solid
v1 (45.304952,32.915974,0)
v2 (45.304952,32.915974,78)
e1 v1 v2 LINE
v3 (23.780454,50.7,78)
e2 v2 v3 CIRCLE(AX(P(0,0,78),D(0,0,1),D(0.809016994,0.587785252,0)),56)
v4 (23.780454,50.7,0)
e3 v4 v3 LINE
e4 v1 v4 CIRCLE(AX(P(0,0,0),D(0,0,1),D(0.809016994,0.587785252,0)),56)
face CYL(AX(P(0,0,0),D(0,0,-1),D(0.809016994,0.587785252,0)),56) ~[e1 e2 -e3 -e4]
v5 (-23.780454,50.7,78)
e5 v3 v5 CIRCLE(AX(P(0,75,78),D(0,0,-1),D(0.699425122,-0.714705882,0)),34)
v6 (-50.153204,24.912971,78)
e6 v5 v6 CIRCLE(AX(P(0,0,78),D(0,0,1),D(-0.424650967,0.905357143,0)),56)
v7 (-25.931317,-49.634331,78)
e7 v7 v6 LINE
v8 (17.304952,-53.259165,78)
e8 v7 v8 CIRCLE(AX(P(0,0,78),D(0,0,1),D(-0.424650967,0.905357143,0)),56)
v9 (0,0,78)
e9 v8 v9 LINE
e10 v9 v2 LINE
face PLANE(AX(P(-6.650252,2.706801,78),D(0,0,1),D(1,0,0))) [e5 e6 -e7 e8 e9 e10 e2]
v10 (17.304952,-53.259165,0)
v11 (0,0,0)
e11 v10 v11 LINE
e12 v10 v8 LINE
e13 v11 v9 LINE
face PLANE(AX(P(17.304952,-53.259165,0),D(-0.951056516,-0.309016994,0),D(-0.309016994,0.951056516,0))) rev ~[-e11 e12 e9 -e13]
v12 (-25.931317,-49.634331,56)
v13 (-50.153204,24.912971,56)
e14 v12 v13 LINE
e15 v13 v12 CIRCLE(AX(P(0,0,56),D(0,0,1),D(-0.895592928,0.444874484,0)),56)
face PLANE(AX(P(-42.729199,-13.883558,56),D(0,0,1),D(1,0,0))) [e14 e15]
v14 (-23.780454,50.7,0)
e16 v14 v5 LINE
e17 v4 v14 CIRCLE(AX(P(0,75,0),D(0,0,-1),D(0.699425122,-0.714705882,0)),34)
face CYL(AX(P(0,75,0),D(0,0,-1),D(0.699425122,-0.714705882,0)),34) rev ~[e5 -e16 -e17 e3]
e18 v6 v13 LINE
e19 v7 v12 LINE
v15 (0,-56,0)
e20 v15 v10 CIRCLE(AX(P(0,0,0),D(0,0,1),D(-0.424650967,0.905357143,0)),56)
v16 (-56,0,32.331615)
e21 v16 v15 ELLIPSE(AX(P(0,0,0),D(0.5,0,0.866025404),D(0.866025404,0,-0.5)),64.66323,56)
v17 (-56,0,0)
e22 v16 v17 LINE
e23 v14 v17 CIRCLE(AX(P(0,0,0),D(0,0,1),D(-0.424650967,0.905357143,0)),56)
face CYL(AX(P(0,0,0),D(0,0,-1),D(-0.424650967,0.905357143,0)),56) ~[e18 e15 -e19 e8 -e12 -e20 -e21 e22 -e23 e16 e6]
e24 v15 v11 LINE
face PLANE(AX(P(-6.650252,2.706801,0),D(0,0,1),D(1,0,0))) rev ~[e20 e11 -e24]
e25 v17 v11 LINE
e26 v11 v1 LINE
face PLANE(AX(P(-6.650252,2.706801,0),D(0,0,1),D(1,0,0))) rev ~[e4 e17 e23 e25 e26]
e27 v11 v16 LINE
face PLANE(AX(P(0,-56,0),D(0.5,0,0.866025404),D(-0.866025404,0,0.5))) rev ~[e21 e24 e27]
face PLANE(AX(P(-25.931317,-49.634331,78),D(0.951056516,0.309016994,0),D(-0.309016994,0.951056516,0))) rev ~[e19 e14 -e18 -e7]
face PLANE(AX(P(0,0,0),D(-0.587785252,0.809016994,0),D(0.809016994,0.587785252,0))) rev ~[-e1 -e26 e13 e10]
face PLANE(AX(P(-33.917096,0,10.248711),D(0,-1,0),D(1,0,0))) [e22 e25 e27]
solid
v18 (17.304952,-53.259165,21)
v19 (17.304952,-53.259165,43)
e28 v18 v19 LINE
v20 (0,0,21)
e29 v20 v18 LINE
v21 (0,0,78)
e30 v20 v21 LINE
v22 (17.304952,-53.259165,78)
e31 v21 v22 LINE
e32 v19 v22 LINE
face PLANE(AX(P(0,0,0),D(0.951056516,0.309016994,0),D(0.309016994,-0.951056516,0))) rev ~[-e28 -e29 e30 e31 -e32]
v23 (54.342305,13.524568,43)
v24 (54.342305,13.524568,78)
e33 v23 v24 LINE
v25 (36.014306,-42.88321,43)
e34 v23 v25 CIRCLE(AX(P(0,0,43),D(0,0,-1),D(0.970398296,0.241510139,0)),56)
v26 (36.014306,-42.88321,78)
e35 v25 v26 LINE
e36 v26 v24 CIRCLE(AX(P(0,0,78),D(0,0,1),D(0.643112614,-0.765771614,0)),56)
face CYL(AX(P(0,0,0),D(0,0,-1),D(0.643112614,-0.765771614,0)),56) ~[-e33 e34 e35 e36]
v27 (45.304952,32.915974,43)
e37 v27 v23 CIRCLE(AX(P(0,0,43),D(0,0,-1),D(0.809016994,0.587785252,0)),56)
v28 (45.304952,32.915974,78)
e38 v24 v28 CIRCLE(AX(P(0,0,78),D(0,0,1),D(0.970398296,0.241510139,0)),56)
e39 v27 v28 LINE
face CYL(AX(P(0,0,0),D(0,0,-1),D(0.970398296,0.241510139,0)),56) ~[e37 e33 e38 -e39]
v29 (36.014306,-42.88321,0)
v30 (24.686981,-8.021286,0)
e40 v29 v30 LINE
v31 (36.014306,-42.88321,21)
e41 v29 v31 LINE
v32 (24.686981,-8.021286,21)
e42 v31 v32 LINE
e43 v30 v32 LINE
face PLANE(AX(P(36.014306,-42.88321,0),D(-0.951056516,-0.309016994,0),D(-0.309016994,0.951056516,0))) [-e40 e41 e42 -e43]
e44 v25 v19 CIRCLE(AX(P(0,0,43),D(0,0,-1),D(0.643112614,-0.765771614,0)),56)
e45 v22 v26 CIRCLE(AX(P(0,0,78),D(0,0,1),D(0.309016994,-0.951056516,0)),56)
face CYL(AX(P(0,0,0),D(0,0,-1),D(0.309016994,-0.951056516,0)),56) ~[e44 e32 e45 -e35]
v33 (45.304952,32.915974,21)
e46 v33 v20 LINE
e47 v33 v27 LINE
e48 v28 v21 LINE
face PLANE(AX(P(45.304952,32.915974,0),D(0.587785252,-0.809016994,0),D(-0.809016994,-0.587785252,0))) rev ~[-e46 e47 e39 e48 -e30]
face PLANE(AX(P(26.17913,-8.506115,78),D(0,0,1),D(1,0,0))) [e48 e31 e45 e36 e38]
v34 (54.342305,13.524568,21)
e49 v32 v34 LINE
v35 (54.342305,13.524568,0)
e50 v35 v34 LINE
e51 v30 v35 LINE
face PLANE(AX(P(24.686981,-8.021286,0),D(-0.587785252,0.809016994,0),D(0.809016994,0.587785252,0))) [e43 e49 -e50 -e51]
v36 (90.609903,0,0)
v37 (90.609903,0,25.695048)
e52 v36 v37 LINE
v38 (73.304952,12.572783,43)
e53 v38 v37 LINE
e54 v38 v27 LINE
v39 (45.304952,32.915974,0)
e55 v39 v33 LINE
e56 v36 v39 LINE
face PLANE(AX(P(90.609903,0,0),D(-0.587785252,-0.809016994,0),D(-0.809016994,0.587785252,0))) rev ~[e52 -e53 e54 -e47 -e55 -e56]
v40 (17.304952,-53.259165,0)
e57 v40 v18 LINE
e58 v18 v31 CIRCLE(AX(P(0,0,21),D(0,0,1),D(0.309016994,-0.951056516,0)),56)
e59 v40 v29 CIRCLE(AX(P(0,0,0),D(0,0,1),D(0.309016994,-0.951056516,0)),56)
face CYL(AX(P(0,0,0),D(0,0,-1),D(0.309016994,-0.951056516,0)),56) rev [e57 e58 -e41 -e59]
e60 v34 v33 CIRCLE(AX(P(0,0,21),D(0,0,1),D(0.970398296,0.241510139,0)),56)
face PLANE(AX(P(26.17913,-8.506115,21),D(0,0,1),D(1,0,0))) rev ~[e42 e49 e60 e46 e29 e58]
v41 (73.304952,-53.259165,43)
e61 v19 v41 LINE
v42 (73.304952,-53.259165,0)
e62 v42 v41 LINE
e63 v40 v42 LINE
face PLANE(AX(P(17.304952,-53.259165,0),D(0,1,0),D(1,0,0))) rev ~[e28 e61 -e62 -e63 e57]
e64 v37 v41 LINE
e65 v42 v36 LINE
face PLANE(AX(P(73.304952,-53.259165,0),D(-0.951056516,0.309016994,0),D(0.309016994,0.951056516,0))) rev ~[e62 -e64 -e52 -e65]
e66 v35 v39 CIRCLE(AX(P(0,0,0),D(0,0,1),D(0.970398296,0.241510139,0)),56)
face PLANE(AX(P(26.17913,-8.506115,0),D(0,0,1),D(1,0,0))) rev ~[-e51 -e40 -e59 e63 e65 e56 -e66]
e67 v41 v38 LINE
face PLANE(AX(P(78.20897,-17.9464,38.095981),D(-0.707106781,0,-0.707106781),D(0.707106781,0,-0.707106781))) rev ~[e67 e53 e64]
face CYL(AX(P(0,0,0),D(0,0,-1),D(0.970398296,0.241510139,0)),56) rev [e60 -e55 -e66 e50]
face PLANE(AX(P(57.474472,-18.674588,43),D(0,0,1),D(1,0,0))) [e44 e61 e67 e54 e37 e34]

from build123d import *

# Parameters (mm, degrees)
F1_DEPTH  = 78
F2_DEPTH  = 43
F4_DEPTH  = 22
F7_DEPTH  = 56
F11_DEPTH = 15
F12_DEPTH = 78
F13_DEPTH = 21
F14_DEPTH = 15


with BuildPart() as f1:
    # F0 (on Top) → F1 (new body)
    with BuildSketch(Plane.XY):
        with BuildLine():
            Line((17.304951685, -53.2591649125), (0, 0))
            Line((0, 0), (45.304951685, 32.9159741284))
            ThreePointArc((45.304951685, 32.9159741284), (35.6688410129, 43.1709830882), (23.7804541588, 50.7))
            ThreePointArc((23.7804541588, 50.7), (0, 41), (-23.7804541588, 50.7))
            ThreePointArc((-23.7804541588, 50.7), (-52.0803228235, -20.5825162359), (17.304951685, -53.2591649125))
        make_face()
    extrude(amount=F1_DEPTH)

    # F3 (on face) → F4 (cut)
    with BuildSketch(Plane.XY.offset(78)):
        with BuildLine():
            ThreePointArc((-50.1532039809, 24.9129711286), (-53.2591649125, -17.304951685), (-25.9313173227, -49.6343306786))
            Line((-25.9313173227, -49.6343306786), (-50.1532039809, 24.9129711286))
        make_face()
    extrude(amount=-F4_DEPTH, mode=Mode.SUBTRACT)

    # F6 (on offset) → F7 (cut)
    with BuildSketch(Plane.XZ.offset(56)):
        Polygon((-56, 0), (0, 0), (-56, 32.3316150746), align=None)
    extrude(amount=-F7_DEPTH, mode=Mode.SUBTRACT)

    # F10 (on face) → F14 (cut)
    with BuildSketch(Plane(origin=(58.1524758425, 0, 58.1524758425), x_dir=(0.7071067812, 0, -0.7071067812), z_dir=(-0.7071067812, 0, -0.7071067812))):
        Polygon((21.42883684, -12.5727833442), (45.9017342091, 0), (21.42883684, 53.2591649125), align=None)
    extrude(amount=-F14_DEPTH, mode=Mode.SUBTRACT)


with BuildPart() as f1b:
    # F0 (on Top) → F1, piece 2 (new body)
    with BuildSketch(Plane.XY):
        with BuildLine():
            ThreePointArc((36.0143064054, -42.8832103992), (53.2591649125, -17.304951685), (54.3423045662, 13.5245678096))
            Line((54.3423045662, 13.5245678096), (24.6869805963, -8.0212862363))
            Line((24.6869805963, -8.0212862363), (36.0143064054, -42.8832103992))
        make_face()
    extrude(amount=F1_DEPTH)

    # F0 (on Top) → F2 (join)
    with BuildSketch(Plane.XY):
        with BuildLine():
            Line((90.60990337, 0), (45.304951685, 32.9159741284))
            ThreePointArc((45.304951685, 32.9159741284), (50.7582562678, 23.6558538347), (54.3423045662, 13.5245678096))
            ThreePointArc((54.3423045662, 13.5245678096), (53.2591649125, -17.304951685), (36.0143064054, -42.8832103992))
            ThreePointArc((36.0143064054, -42.8832103992), (27.1597299111, -48.972942235), (17.304951685, -53.2591649125))
            Line((17.304951685, -53.2591649125), (73.304951685, -53.2591649125))
            Line((73.304951685, -53.2591649125), (90.60990337, 0))
        make_face()
    extrude(amount=F2_DEPTH)

    # F10 (on face) → F11 (cut)
    with BuildSketch(Plane(origin=(58.1524758425, 0, 58.1524758425), x_dir=(0.7071067812, 0, -0.7071067812), z_dir=(-0.7071067812, 0, -0.7071067812))):
        Polygon((21.42883684, -12.5727833442), (45.9017342091, 0), (21.42883684, 53.2591649125), align=None)
    extrude(amount=-F11_DEPTH, mode=Mode.SUBTRACT)

    # F0 (on Top) → F12 (join)
    with BuildSketch(Plane.XY):
        with BuildLine():
            Line((45.304951685, 32.9159741284), (0, 0))
            Line((0, 0), (17.304951685, -53.2591649125))
            ThreePointArc((17.304951685, -53.2591649125), (27.1597299111, -48.972942235), (36.0143064054, -42.8832103992))
            Line((36.0143064054, -42.8832103992), (24.6869805963, -8.0212862363))
            Line((24.6869805963, -8.0212862363), (54.3423045662, 13.5245678096))
            ThreePointArc((54.3423045662, 13.5245678096), (50.7582562678, 23.6558538347), (45.304951685, 32.9159741284))
        make_face()
    extrude(amount=F12_DEPTH)

    # F0 (on Top) → F13 (cut)
    with BuildSketch(Plane.XY):
        with BuildLine():
            Line((45.304951685, 32.9159741284), (0, 0))
            Line((0, 0), (17.304951685, -53.2591649125))
            ThreePointArc((17.304951685, -53.2591649125), (27.1597299111, -48.972942235), (36.0143064054, -42.8832103992))
            Line((36.0143064054, -42.8832103992), (24.6869805963, -8.0212862363))
            Line((24.6869805963, -8.0212862363), (54.3423045662, 13.5245678096))
            ThreePointArc((54.3423045662, 13.5245678096), (50.7582562678, 23.6558538347), (45.304951685, 32.9159741284))
        make_face()
    extrude(amount=F13_DEPTH, mode=Mode.SUBTRACT)


solid = Compound([f1.part, f1b.part])
